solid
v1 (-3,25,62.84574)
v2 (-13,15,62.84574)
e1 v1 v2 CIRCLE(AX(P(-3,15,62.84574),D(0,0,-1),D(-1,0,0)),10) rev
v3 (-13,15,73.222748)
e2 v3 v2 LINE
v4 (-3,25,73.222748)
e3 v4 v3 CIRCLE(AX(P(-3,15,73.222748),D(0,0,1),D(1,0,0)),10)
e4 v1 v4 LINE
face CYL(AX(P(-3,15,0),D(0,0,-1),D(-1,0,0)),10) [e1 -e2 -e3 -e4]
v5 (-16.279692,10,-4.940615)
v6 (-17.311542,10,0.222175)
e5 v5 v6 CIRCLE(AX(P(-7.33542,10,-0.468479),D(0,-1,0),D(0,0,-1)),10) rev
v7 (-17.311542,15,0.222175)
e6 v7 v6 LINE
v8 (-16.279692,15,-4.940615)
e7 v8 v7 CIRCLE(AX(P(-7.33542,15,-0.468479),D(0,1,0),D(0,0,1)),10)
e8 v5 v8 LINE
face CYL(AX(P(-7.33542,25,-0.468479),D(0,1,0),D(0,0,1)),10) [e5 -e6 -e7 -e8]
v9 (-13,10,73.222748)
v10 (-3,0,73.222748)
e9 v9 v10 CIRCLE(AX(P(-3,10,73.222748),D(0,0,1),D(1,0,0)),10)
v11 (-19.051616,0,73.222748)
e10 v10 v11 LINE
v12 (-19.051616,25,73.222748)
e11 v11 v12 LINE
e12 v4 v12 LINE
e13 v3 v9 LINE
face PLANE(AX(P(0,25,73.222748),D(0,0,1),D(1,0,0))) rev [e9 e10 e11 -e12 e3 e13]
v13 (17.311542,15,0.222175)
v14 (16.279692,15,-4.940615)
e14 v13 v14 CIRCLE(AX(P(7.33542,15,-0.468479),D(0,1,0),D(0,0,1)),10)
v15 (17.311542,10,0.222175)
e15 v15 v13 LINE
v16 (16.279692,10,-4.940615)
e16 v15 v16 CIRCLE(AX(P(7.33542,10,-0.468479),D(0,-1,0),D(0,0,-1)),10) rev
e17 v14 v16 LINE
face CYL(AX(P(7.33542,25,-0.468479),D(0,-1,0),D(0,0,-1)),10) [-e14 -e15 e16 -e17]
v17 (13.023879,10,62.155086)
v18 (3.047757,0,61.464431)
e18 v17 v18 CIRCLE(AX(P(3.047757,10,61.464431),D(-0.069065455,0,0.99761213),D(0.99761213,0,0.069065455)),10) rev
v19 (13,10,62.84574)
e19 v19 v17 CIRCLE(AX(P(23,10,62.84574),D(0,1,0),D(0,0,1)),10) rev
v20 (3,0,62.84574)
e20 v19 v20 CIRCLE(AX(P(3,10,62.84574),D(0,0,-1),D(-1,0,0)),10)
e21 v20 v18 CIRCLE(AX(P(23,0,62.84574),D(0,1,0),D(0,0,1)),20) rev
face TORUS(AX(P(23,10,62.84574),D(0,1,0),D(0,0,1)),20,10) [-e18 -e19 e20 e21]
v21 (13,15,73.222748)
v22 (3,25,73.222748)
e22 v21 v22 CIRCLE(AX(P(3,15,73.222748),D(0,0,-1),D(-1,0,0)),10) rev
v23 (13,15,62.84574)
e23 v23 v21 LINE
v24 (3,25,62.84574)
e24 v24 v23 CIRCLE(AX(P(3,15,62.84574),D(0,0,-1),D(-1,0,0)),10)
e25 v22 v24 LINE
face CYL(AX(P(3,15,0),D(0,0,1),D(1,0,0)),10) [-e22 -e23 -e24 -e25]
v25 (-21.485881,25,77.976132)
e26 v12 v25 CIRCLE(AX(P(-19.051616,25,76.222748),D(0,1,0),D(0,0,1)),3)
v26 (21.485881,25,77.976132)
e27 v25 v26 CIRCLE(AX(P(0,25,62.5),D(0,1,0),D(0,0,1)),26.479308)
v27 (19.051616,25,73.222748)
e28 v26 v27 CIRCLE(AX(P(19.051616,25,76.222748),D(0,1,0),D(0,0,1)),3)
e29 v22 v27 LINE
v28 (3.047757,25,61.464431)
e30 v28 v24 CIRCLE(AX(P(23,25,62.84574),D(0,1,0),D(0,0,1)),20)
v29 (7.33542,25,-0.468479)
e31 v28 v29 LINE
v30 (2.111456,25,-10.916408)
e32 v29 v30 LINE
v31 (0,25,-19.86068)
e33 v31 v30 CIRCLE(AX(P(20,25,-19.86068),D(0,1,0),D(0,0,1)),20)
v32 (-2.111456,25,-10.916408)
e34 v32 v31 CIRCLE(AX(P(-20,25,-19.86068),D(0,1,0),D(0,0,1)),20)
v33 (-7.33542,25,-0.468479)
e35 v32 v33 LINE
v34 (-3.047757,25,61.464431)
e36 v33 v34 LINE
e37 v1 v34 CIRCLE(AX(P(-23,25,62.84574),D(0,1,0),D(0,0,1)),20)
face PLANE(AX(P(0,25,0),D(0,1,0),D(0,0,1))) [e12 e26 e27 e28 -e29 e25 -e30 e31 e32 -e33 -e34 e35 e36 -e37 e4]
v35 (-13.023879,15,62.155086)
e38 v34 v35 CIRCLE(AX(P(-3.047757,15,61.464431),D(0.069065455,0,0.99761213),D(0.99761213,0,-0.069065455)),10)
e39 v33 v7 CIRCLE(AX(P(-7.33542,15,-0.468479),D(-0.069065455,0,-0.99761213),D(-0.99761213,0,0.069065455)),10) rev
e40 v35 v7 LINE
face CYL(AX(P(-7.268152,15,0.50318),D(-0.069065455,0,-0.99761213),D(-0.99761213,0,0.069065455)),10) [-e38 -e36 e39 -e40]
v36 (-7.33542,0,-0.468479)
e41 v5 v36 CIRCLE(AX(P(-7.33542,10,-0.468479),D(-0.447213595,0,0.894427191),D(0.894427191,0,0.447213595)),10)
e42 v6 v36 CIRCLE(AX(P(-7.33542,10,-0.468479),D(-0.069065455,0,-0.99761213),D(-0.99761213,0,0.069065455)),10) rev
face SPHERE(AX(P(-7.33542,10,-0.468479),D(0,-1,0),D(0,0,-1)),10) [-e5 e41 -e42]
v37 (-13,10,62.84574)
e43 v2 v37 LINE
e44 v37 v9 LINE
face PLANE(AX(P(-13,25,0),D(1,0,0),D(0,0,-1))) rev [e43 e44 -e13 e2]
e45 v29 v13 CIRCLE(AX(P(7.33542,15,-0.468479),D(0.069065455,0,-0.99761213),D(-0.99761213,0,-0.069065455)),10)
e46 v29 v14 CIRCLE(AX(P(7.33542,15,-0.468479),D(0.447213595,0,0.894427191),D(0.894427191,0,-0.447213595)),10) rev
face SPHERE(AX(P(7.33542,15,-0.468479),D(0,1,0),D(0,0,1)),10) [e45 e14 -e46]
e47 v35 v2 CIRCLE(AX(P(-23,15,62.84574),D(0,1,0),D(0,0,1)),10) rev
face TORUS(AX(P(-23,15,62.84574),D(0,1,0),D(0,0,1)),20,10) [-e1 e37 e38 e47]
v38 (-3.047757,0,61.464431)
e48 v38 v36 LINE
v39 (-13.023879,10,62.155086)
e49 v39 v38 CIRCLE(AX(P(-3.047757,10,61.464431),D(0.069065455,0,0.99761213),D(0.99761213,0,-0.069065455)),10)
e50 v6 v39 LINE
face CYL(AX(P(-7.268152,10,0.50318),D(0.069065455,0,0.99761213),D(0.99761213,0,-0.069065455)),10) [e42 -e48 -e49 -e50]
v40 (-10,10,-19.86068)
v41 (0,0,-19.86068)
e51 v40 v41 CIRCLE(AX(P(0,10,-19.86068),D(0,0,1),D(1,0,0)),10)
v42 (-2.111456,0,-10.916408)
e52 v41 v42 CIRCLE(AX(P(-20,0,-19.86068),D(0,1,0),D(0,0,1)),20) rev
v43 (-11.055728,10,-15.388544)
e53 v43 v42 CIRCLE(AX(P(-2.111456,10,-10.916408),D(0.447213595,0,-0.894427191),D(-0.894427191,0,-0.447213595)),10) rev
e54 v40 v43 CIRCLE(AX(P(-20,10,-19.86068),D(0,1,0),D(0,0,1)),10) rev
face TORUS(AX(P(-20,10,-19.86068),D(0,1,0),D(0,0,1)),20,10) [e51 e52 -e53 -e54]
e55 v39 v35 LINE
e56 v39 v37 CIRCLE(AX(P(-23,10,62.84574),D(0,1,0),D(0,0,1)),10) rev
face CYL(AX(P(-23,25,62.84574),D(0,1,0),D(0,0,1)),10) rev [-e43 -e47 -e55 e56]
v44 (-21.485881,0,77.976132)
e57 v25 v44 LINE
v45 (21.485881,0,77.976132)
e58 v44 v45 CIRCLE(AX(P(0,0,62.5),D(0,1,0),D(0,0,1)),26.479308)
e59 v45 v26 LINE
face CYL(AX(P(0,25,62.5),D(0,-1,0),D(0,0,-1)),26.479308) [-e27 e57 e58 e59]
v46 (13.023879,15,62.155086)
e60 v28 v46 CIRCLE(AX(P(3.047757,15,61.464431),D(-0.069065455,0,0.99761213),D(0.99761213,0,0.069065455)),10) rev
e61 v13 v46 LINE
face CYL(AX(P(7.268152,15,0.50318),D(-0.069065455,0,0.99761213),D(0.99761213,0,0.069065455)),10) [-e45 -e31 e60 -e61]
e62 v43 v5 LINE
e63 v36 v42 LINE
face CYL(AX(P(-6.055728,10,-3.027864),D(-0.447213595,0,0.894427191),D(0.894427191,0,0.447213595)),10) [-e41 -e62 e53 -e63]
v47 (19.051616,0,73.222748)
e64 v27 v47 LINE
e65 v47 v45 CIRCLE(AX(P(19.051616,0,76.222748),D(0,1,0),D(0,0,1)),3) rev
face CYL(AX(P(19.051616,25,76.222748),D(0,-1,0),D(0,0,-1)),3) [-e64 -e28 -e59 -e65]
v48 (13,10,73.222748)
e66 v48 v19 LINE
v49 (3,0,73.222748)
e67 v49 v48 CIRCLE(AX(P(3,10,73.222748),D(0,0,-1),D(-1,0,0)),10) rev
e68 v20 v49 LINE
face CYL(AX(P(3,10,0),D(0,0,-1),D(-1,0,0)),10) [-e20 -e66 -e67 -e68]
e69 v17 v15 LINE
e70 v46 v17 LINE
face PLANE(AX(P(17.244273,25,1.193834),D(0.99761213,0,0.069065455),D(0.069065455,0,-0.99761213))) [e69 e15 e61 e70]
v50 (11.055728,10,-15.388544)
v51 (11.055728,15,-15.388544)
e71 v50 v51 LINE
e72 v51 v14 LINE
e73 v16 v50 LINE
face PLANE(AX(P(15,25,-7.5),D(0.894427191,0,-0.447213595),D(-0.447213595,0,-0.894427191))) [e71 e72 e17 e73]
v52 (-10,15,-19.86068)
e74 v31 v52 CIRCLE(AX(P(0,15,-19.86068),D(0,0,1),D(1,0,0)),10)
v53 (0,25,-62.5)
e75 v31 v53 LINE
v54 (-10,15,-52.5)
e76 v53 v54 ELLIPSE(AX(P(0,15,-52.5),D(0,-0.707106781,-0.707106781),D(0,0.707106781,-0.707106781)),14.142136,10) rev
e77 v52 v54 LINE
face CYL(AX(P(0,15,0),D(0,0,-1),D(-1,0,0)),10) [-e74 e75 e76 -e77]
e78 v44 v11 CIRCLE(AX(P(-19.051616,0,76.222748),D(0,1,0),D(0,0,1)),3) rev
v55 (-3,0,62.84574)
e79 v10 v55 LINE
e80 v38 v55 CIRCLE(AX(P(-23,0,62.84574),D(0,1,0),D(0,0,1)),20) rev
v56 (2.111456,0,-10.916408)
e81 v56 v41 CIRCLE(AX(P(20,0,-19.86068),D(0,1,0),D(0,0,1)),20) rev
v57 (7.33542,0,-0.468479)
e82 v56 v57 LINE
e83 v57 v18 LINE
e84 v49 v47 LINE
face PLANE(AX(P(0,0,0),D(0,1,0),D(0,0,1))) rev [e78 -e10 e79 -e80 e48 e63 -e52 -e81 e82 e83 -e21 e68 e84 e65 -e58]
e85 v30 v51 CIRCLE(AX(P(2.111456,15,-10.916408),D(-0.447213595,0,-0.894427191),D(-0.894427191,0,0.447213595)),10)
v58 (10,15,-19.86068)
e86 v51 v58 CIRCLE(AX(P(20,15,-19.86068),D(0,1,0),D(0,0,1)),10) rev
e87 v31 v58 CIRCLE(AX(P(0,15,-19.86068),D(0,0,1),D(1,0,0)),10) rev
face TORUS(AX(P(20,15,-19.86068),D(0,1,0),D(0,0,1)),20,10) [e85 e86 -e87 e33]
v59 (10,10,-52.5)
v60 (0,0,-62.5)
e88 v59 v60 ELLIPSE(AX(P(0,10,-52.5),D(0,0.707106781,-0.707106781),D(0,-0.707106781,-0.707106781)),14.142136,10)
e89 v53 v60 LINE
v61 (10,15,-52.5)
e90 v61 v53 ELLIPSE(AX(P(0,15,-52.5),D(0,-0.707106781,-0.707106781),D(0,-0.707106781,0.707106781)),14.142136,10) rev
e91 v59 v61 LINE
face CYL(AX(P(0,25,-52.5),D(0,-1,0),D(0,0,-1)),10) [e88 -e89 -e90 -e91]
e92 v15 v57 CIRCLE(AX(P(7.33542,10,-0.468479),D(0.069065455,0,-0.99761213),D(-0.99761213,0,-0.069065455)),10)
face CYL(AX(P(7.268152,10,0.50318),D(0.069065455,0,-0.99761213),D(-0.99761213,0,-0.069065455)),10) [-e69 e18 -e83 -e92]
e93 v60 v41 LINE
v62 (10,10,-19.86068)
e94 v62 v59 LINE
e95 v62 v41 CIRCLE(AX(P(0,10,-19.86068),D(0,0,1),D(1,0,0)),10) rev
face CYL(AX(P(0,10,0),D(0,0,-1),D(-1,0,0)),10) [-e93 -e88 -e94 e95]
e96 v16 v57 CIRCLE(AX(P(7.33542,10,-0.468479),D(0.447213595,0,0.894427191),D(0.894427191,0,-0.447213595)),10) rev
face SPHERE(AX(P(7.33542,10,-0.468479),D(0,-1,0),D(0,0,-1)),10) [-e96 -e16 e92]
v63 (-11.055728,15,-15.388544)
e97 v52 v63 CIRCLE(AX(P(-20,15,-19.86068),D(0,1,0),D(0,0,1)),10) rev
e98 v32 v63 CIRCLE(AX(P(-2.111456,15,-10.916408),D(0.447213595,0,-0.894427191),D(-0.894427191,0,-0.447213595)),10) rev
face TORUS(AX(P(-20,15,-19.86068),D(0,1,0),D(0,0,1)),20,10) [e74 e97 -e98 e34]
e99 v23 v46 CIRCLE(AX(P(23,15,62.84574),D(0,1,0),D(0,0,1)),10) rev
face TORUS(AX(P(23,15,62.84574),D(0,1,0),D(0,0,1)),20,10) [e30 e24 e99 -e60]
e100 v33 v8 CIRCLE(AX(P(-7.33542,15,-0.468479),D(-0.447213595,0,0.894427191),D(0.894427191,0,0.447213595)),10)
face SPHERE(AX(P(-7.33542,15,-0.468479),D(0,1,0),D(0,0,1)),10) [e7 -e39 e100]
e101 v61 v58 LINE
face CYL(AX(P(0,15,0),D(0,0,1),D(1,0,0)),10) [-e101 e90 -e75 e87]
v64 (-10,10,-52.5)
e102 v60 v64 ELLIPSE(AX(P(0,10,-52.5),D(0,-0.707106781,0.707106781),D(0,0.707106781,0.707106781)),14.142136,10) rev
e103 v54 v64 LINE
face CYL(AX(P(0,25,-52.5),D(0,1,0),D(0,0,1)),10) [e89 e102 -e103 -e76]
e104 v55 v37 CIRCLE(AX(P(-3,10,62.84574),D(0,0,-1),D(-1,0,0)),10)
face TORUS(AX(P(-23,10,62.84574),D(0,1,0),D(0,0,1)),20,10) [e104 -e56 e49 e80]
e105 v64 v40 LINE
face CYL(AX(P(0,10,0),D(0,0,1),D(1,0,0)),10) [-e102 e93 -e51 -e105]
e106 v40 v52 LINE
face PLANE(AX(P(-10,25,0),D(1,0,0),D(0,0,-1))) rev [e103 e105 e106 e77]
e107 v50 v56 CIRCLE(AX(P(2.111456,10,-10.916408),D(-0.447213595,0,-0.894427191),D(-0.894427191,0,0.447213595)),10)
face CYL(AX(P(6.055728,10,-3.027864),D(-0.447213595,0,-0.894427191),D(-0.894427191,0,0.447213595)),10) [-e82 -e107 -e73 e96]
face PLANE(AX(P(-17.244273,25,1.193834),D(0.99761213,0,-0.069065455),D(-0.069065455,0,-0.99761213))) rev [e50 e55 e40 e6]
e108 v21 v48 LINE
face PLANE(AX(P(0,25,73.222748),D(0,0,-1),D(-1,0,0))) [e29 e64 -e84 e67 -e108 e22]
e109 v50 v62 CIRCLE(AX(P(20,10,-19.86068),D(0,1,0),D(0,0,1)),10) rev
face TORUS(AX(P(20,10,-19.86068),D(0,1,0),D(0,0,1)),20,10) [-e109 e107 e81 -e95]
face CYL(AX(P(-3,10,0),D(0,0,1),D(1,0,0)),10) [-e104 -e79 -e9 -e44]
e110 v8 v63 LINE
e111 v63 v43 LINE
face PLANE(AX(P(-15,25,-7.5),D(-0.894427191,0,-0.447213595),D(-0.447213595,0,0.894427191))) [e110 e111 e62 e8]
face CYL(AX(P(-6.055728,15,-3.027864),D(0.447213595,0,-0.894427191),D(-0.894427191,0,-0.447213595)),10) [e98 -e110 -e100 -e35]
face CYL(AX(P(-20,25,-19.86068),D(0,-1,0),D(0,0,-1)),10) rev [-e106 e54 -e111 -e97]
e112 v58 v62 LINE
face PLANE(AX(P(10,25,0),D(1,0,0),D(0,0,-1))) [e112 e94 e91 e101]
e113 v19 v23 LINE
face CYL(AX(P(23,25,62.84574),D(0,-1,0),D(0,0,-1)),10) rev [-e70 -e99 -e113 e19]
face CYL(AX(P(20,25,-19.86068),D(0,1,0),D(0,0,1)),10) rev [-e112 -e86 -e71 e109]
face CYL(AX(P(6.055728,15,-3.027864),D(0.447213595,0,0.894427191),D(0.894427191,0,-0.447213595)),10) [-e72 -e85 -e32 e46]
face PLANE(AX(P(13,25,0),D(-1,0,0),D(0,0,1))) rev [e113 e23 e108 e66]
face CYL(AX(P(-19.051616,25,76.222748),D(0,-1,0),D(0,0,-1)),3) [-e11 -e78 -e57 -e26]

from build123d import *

# Parameters (mm, degrees)
SKETCH_1_W      = 26
SKETCH_1_H      = 0.722748137
EXTRUDE_1_DEPTH = 25
FILLET_1_R      = 3
FILLET_2_R      = 10


with BuildPart() as part:
    # 草图1 → 凸台-拉伸1 (new body)
    with BuildSketch(Plane(origin=(0, 0, 0), x_dir=(1, 0, 0), z_dir=(0, 1, 0))):
        with BuildLine():
            Line((-13, -85.256490319), (-13, -73.222748137))
            Line((-13, -73.222748137), (-24.211080276, -73.222748137))
            ThreePointArc((-24.211080276, -73.222748137), (0, -88.97930769), (24.211080276, -73.222748137))
            Line((24.211080276, -73.222748137), (13, -73.222748137))
            Line((13, -73.222748137), (13, -85.256490319))
            Line((13, -85.256490319), (-13, -85.256490319))
        make_face()
        with BuildLine():
            ThreePointArc((13, -73.222748137), (0, -79.351626853), (-13, -73.222748137))
            Line((-13, -73.222748137), (-13, -85.256490319))
            Line((-13, -85.256490319), (13, -85.256490319))
            Line((13, -85.256490319), (13, -73.222748137))
        make_face()
        with BuildLine():
            Line((13, -73.222748137), (-13, -73.222748137))
            ThreePointArc((-13, -73.222748137), (0, -79.351626853), (13, -73.222748137))
        make_face()
        with Locations((0, -72.861374068)):
            Rectangle(SKETCH_1_W, SKETCH_1_H)
        Polygon((13, -62.5), (0, -62.5), (-13, -62.5), (-13, -72.5), (13, -72.5), align=None)
        with BuildLine():
            Line((0, -62.5), (0, -45.648373147))
            ThreePointArc((0, -45.648373147), (-7.186152558, -47.257410357), (-13, -51.777251863))
            Line((-13, -51.777251863), (-13, -62.5))
            Line((-13, -62.5), (0, -62.5))
        make_face()
        with BuildLine():
            ThreePointArc((13, -51.777251863), (7.186152558, -47.257410357), (0, -45.648373147))
            Line((0, -45.648373147), (0, -62.5))
            Line((0, -62.5), (13, -62.5))
            Line((13, -62.5), (13, -51.777251863))
        make_face()
        with BuildLine():
            ThreePointArc((13, -39.431542406), (6.72000555, -36.887595561), (0, -36.02069231))
            Line((0, -36.02069231), (0, -45.648373147))
            ThreePointArc((0, -45.648373147), (7.186152558, -47.257410357), (13, -51.777251863))
            Line((13, -51.777251863), (13, -39.431542406))
        make_face()
        with BuildLine():
            Line((0, -45.648373147), (0, -36.02069231))
            ThreePointArc((0, -36.02069231), (-6.72000555, -36.887595561), (-13, -39.431542406))
            Line((-13, -39.431542406), (-13, -51.777251863))
            ThreePointArc((-13, -51.777251863), (-7.186152558, -47.257410357), (0, -45.648373147))
        make_face()
        with BuildLine():
            Line((0, -36.02069231), (0, 2.5))
            Line((0, 2.5), (-13, 2.5))
            Line((-13, 2.5), (-13, -39.431542406))
            ThreePointArc((-13, -39.431542406), (-6.72000555, -36.887595561), (0, -36.02069231))
        make_face()
        with BuildLine():
            Line((13, 2.5), (0, 2.5))
            Line((0, 2.5), (0, -36.02069231))
            ThreePointArc((0, -36.02069231), (6.72000555, -36.887595561), (13, -39.431542406))
            Line((13, -39.431542406), (13, 2.5))
        make_face()
        Polygon((0, 2.5), (0, 62.5), (-10, 62.5), (-10, 17.5), (-17.5, 2.5), (-13, 2.5), align=None)
        Polygon((10, 62.5), (0, 62.5), (0, 2.5), (13, 2.5), (17.5, 2.5), (10, 17.5), align=None)
        with BuildLine():
            Line((17.5, 2.5), (13, 2.5))
            Line((13, 2.5), (13, -39.431542406))
            ThreePointArc((13, -39.431542406), (13.774122837, -39.885242079), (14.532429345, -40.364909463))
            Line((14.532429345, -40.364909463), (17.5, 2.5))
        make_face()
        with BuildLine():
            Line((-13, -39.431542406), (-13, 2.5))
            Line((-13, 2.5), (-17.5, 2.5))
            Line((-17.5, 2.5), (-14.532429345, -40.364909463))
            ThreePointArc((-14.532429345, -40.364909463), (-13.774122837, -39.885242079), (-13, -39.431542406))
        make_face()
        with BuildLine():
            ThreePointArc((14.532429345, -40.364909463), (13.774122837, -39.885242079), (13, -39.431542406))
            Line((13, -39.431542406), (13, -51.777251863))
            ThreePointArc((13, -51.777251863), (13.347894441, -52.213550583), (13.681152635, -52.661128612))
            Line((13.681152635, -52.661128612), (14.532429345, -40.364909463))
        make_face()
        with BuildLine():
            Line((-13, -51.777251863), (-13, -39.431542406))
            ThreePointArc((-13, -39.431542406), (-13.774122837, -39.885242079), (-14.532429345, -40.364909463))
            Line((-14.532429345, -40.364909463), (-13.681152635, -52.661128612))
            ThreePointArc((-13.681152635, -52.661128612), (-13.347894441, -52.213550583), (-13, -51.777251863))
        make_face()
        with BuildLine():
            ThreePointArc((13.681152635, -52.661128612), (13.347894441, -52.213550583), (13, -51.777251863))
            Line((13, -51.777251863), (13, -62.5))
            Line((13, -62.5), (13.681152635, -52.661128612))
        make_face()
        with BuildLine():
            Line((-13, -62.5), (-13, -51.777251863))
            ThreePointArc((-13, -51.777251863), (-13.347894441, -52.213550583), (-13.681152635, -52.661128612))
            Line((-13.681152635, -52.661128612), (-13, -62.5))
        make_face()
    extrude(amount=EXTRUDE_1_DEPTH)

    # 圆角1
    fillet_1_edges = [part.edges().sort_by_distance(p)[0] for p in [
        (24.211080276, 12.5, 73.222748137),
        (-24.211080276, 12.5, 73.222748137),
    ]]
    fillet(fillet_1_edges, radius=FILLET_1_R)

    # 圆角2
    # the kernel refuses this fillet: 10 mm, written as the material it adds along each edge
    with BuildSketch(Plane(origin=(-10, 0, -17.5), x_dir=(-0.44721359549995854, 0, 0.8944271909999156), z_dir=(0, 1, 0)), Plane(origin=(10, 0, -17.5), x_dir=(0, 0, -1), z_dir=(0, 1, 0))) as fillet_2_piece_1:
        with BuildLine():
            CenterArc((FILLET_2_R * 0.2360679775, -FILLET_2_R), FILLET_2_R, 90, 26.565051177)
            Line((-FILLET_2_R * 0.211145618, -FILLET_2_R * 0.105572809), (0, 0))
            Line((0, 0), (FILLET_2_R * 0.2360679775, 0))
        make_face()
    extrude(amount=25)
    with BuildSketch(Plane(origin=(-13, 0, 62.5), x_dir=(0, 0, 1), z_dir=(0, 1, 0))) as fillet_2_piece_2:
        with BuildLine():
            CenterArc((FILLET_2_R * 0.0345740067021, -FILLET_2_R), FILLET_2_R, 90, 3.96031183)
            Line((-FILLET_2_R * 0.0344914484856, -FILLET_2_R * 0.00238786951054), (0, 0))
            Line((0, 0), (FILLET_2_R * 0.0345740067021, 0))
        make_face()
    extrude(amount=25)
    with BuildSketch(Plane(origin=(13, 0, 62.5), x_dir=(0, 0, 1), z_dir=(0, 1, 0))) as fillet_2_piece_3:
        with BuildLine():
            CenterArc((FILLET_2_R * 0.0345740067021, FILLET_2_R), FILLET_2_R, 266.03968817, 3.96031183)
            Line((-FILLET_2_R * 0.0344914484856, FILLET_2_R * 0.00238786951054), (0, 0))
            Line((0, 0), (FILLET_2_R * 0.0345740067021, 0))
        make_face()
    extrude(amount=25)
    # the kernel refuses this fillet: 10 mm, written as the material it takes off along each edge
    with BuildSketch(Plane(origin=(-10, -25, -62.5), x_dir=(0, 0, 1), z_dir=(0, 1, 0)), Plane(origin=(10, -25, -62.5), x_dir=(-1, 0, 0), z_dir=(0, 1, 0))) as fillet_2_2_piece_1:
        with BuildLine():
            CenterArc((FILLET_2_R, FILLET_2_R), FILLET_2_R, 180, 90)
            Line((0, FILLET_2_R), (0, 0))
            Line((0, 0), (FILLET_2_R, 0))
        make_face()
    extrude(amount=75, mode=Mode.SUBTRACT)
    with BuildSketch(Plane(origin=(-17.5, -6.821727287, -2.5), x_dir=(0.06906545518773138, 0, 0.9976121304894561), z_dir=(0, 1, 0))) as fillet_2_2_piece_2:
        with BuildLine():
            CenterArc((FILLET_2_R * 0.272869091474, FILLET_2_R), FILLET_2_R, 239.474636992, 30.525363008)
            Line((-FILLET_2_R * 0.235050637395, FILLET_2_R * 0.138595594958), (0, 0))
            Line((0, 0), (FILLET_2_R * 0.272869091474, 0))
        make_face()
    extrude(amount=38.643454574, mode=Mode.SUBTRACT)
    with BuildSketch(Plane(origin=(17.5, -6.821727287, -2.5), x_dir=(-0.06906545518773137, 0, 0.9976121304894561), z_dir=(0, 1, 0))) as fillet_2_2_piece_3:
        with BuildLine():
            CenterArc((FILLET_2_R * 0.272869091474, -FILLET_2_R), FILLET_2_R, 90, 30.525363008)
            Line((-FILLET_2_R * 0.235050637395, -FILLET_2_R * 0.138595594958), (0, 0))
            Line((0, 0), (FILLET_2_R * 0.272869091474, 0))
        make_face()
    extrude(amount=38.643454574, mode=Mode.SUBTRACT)
    # the kernel refuses this fillet: 10 mm, written as the material it takes off along each edge
    with BuildSketch(Plane(origin=(-13, 0, 62.845740067), x_dir=(1, 0, 0), z_dir=(0, 0, 1)), Plane(origin=(-13, 25, 62.845740067), x_dir=(0, -1, 0), z_dir=(0, 0, 1)), Plane(origin=(13, 25, 73.222748137), x_dir=(0, -1, 0), z_dir=(0, 0, -1))) as fillet_2_3_piece_1:
        with BuildLine():
            CenterArc((FILLET_2_R, FILLET_2_R), FILLET_2_R, 180, 90)
            Line((0, FILLET_2_R), (0, 0))
            Line((0, 0), (FILLET_2_R, 0))
        make_face()
    extrude(amount=10.37700807, mode=Mode.SUBTRACT)
    with BuildSketch(Plane(origin=(13, 0, 62.845740067), x_dir=(-1, 0, 0), z_dir=(0, 0, 1))) as fillet_2_3_piece_2:
        with BuildLine():
            CenterArc((FILLET_2_R, -FILLET_2_R), FILLET_2_R, 90, 90)
            Line((0, -FILLET_2_R), (0, 0))
            Line((0, 0), (FILLET_2_R, 0))
        make_face()
    extrude(amount=10.37700807, mode=Mode.SUBTRACT)
    with BuildSketch(Plane(origin=(16.279692325, 0, -4.94061535), x_dir=(-0.8944271909999149, 0, 0.44721359549996015), z_dir=(-0.44721359549996015, 0, -0.8944271909999147)), Plane(origin=(16.279692325, 25, -4.94061535), x_dir=(0, -1, 0), z_dir=(-0.44721359549996015, 0, -0.8944271909999147)), Plane(origin=(-11.05572809, 0, -15.38854382), x_dir=(0.8944271909999155, 0, 0.44721359549995876), z_dir=(-0.4472135954999587, 0, 0.8944271909999155)), Plane(origin=(-11.05572809, 25, -15.38854382), x_dir=(0, -1, 0), z_dir=(-0.4472135954999587, 0, 0.8944271909999155))) as fillet_2_3_piece_3:
        with BuildLine():
            CenterArc((FILLET_2_R, FILLET_2_R), FILLET_2_R, 180, 90)
            Line((0, FILLET_2_R), (0, 0))
            Line((0, 0), (FILLET_2_R, 0))
        make_face()
    extrude(amount=11.681139142, mode=Mode.SUBTRACT)
    with BuildSketch(Plane(origin=(-10, 0, -77.5), x_dir=(1, 0, 0), z_dir=(0, 0, 1)), Plane(origin=(-10, 25, -77.5), x_dir=(0, -1, 0), z_dir=(0, 0, 1)), Plane(origin=(10, 0, -19.860679775), x_dir=(-1, 0, 0), z_dir=(0, 0, -1)), Plane(origin=(10, 25, -19.860679775), x_dir=(0, -1, 0), z_dir=(0, 0, -1))) as fillet_2_3_piece_4:
        with BuildLine():
            CenterArc((FILLET_2_R, FILLET_2_R), FILLET_2_R, 180, 90)
            Line((0, FILLET_2_R), (0, 0))
            Line((0, 0), (FILLET_2_R, 0))
        make_face()
    extrude(amount=57.639320225, mode=Mode.SUBTRACT)
    with BuildSketch(Plane(origin=(-13.023878695, 0, 62.155085515), x_dir=(0.9976121304894561, 0, -0.06906545518773156), z_dir=(-0.06906545518773156, 0, -0.9976121304894561)), Plane(origin=(17.31154172, 0, 0.222175157), x_dir=(-0.9976121304894561, 0, -0.06906545518773156), z_dir=(-0.06906545518773156, 0, 0.9976121304894561))) as fillet_2_3_piece_5:
        with BuildLine():
            CenterArc((FILLET_2_R, -FILLET_2_R), FILLET_2_R, 90, 90)
            Line((0, -FILLET_2_R), (0, 0))
            Line((0, 0), (FILLET_2_R, 0))
        make_face()
    extrude(amount=62.081152048, mode=Mode.SUBTRACT)
    with BuildSketch(Plane(origin=(-17.31154172, 25, 0.222175157), x_dir=(0, -1, 0), z_dir=(0.06906545518773156, 0, 0.9976121304894561)), Plane(origin=(13.023878695, 25, 62.155085515), x_dir=(0, -1, 0), z_dir=(0.06906545518773156, 0, -0.9976121304894561))) as fillet_2_3_piece_6:
        with BuildLine():
            CenterArc((FILLET_2_R, FILLET_2_R), FILLET_2_R, 180, 90)
            Line((0, FILLET_2_R), (0, 0))
            Line((0, 0), (FILLET_2_R, 0))
        make_face()
    extrude(amount=62.081152048, mode=Mode.SUBTRACT)
    with BuildSketch(Plane(origin=(20, 25, -19.860679775), x_dir=(-1, 0, 0), z_dir=(0, 0, -1))) as fillet_2_3_piece_7:
        with BuildLine():
            CenterArc((10 + FILLET_2_R, -FILLET_2_R), FILLET_2_R, 90, 90)
            Line((10 + FILLET_2_R, 0), (10, 0))
            Line((10, 0), (10, -FILLET_2_R))
        make_face()
    revolve(axis=Axis((20, 25, -19.860679775), (0, 1, 0)), revolution_arc=26.565051177, mode=Mode.SUBTRACT)
    with BuildSketch(Plane(origin=(20, 0, -19.860679775), x_dir=(-1, 0, 0), z_dir=(0, 0, -1))) as fillet_2_3_piece_8:
        with BuildLine():
            CenterArc((10 + FILLET_2_R, FILLET_2_R), FILLET_2_R, 180, 90)
            Line((10, FILLET_2_R), (10, 0))
            Line((10, 0), (10 + FILLET_2_R, 0))
        make_face()
    revolve(axis=Axis((20, 0, -19.860679775), (0, 1, 0)), revolution_arc=26.565051177, mode=Mode.SUBTRACT)
    with BuildSketch(Plane(origin=(23, 25, 62.845740067), x_dir=(-1, 0, 0), z_dir=(0, 0, 1))) as fillet_2_3_piece_9:
        with BuildLine():
            CenterArc((10 + FILLET_2_R, FILLET_2_R), FILLET_2_R, 180, 90)
            Line((10 + FILLET_2_R, 0), (10, 0))
            Line((10, 0), (10, FILLET_2_R))
        make_face()
    revolve(axis=Axis((23, 25, 62.845740067), (0, -1, 0)), revolution_arc=3.96031183, mode=Mode.SUBTRACT)
    with BuildSketch(Plane(origin=(7.335420415, 25, -0.468479395), x_dir=(0.8944271909999149, 0, -0.4472135954999599), z_dir=(-0.4472135954999599, 0, -0.8944271909999149))) as fillet_2_3_piece_10:
        with BuildLine():
            CenterArc((10 - FILLET_2_R, FILLET_2_R), FILLET_2_R, 270, 90)
            Line((10 - FILLET_2_R, 0), (10, 0))
            Line((10, 0), (10, FILLET_2_R))
        make_face()
    revolve(axis=Axis((7.335420415, 25, -0.468479395), (0, -1, 0)), revolution_arc=30.525363008, mode=Mode.SUBTRACT)
    with BuildSketch(Plane(origin=(7.335420415, 0, -0.468479395), x_dir=(0.8944271909999149, 0, -0.4472135954999599), z_dir=(-0.4472135954999599, 0, -0.8944271909999149))) as fillet_2_3_piece_11:
        with BuildLine():
            CenterArc((10 - FILLET_2_R, -FILLET_2_R), FILLET_2_R, 0, 90)
            Line((10, -FILLET_2_R), (10, 0))
            Line((10, 0), (10 - FILLET_2_R, 0))
        make_face()
    revolve(axis=Axis((7.335420415, 0, -0.468479395), (0, -1, 0)), revolution_arc=30.525363008, mode=Mode.SUBTRACT)
    with BuildSketch(Plane(origin=(23, 0, 62.845740067), x_dir=(-1, 0, 0), z_dir=(0, 0, 1))) as fillet_2_3_piece_12:
        with BuildLine():
            CenterArc((10 + FILLET_2_R, -FILLET_2_R), FILLET_2_R, 90, 90)
            Line((10, -FILLET_2_R), (10, 0))
            Line((10, 0), (10 + FILLET_2_R, 0))
        make_face()
    revolve(axis=Axis((23, 0, 62.845740067), (0, -1, 0)), revolution_arc=3.96031183, mode=Mode.SUBTRACT)
    with BuildSketch(Plane(origin=(-7.335420415, 25, -0.468479395), x_dir=(-0.9976121304894561, 0, 0.06906545518773152), z_dir=(0.06906545518773152, 0, 0.9976121304894561))) as fillet_2_3_piece_13:
        with BuildLine():
            CenterArc((10 - FILLET_2_R, FILLET_2_R), FILLET_2_R, 270, 90)
            Line((10 - FILLET_2_R, 0), (10, 0))
            Line((10, 0), (10, FILLET_2_R))
        make_face()
    revolve(axis=Axis((-7.335420415, 25, -0.468479395), (0, -1, 0)), revolution_arc=30.525363008, mode=Mode.SUBTRACT)
    with BuildSketch(Plane(origin=(-23, 25, 62.845740067), x_dir=(1, 0, 0), z_dir=(0, 0, 1))) as fillet_2_3_piece_14:
        with BuildLine():
            CenterArc((10 + FILLET_2_R, -FILLET_2_R), FILLET_2_R, 90, 90)
            Line((10 + FILLET_2_R, 0), (10, 0))
            Line((10, 0), (10, -FILLET_2_R))
        make_face()
    revolve(axis=Axis((-23, 25, 62.845740067), (0, 1, 0)), revolution_arc=3.96031183, mode=Mode.SUBTRACT)
    with BuildSketch(Plane(origin=(-23, 0, 62.845740067), x_dir=(1, 0, 0), z_dir=(0, 0, 1))) as fillet_2_3_piece_15:
        with BuildLine():
            CenterArc((10 + FILLET_2_R, FILLET_2_R), FILLET_2_R, 180, 90)
            Line((10, FILLET_2_R), (10, 0))
            Line((10, 0), (10 + FILLET_2_R, 0))
        make_face()
    revolve(axis=Axis((-23, 0, 62.845740067), (0, 1, 0)), revolution_arc=3.96031183, mode=Mode.SUBTRACT)
    with BuildSketch(Plane(origin=(-7.335420415, 0, -0.468479395), x_dir=(-0.9976121304894561, 0, 0.06906545518773152), z_dir=(0.06906545518773152, 0, 0.9976121304894561))) as fillet_2_3_piece_16:
        with BuildLine():
            CenterArc((10 - FILLET_2_R, -FILLET_2_R), FILLET_2_R, 0, 90)
            Line((10, -FILLET_2_R), (10, 0))
            Line((10, 0), (10 - FILLET_2_R, 0))
        make_face()
    revolve(axis=Axis((-7.335420415, 0, -0.468479395), (0, -1, 0)), revolution_arc=30.525363008, mode=Mode.SUBTRACT)
    with BuildSketch(Plane(origin=(-20, 25, -19.860679775), x_dir=(0.8944271909999155, 0, 0.44721359549995865), z_dir=(-0.44721359549995865, 0, 0.8944271909999155))) as fillet_2_3_piece_17:
        with BuildLine():
            CenterArc((10 + FILLET_2_R, -FILLET_2_R), FILLET_2_R, 90, 90)
            Line((10 + FILLET_2_R, 0), (10, 0))
            Line((10, 0), (10, -FILLET_2_R))
        make_face()
    revolve(axis=Axis((-20, 25, -19.860679775), (0, 1, 0)), revolution_arc=26.565051177, mode=Mode.SUBTRACT)
    with BuildSketch(Plane(origin=(-20, 0, -19.860679775), x_dir=(0.8944271909999155, 0, 0.44721359549995865), z_dir=(-0.44721359549995865, 0, 0.8944271909999155))) as fillet_2_3_piece_18:
        with BuildLine():
            CenterArc((10 + FILLET_2_R, FILLET_2_R), FILLET_2_R, 180, 90)
            Line((10, FILLET_2_R), (10, 0))
            Line((10, 0), (10 + FILLET_2_R, 0))
        make_face()
    revolve(axis=Axis((-20, 0, -19.860679775), (0, 1, 0)), revolution_arc=26.565051177, mode=Mode.SUBTRACT)


solid = part.part
